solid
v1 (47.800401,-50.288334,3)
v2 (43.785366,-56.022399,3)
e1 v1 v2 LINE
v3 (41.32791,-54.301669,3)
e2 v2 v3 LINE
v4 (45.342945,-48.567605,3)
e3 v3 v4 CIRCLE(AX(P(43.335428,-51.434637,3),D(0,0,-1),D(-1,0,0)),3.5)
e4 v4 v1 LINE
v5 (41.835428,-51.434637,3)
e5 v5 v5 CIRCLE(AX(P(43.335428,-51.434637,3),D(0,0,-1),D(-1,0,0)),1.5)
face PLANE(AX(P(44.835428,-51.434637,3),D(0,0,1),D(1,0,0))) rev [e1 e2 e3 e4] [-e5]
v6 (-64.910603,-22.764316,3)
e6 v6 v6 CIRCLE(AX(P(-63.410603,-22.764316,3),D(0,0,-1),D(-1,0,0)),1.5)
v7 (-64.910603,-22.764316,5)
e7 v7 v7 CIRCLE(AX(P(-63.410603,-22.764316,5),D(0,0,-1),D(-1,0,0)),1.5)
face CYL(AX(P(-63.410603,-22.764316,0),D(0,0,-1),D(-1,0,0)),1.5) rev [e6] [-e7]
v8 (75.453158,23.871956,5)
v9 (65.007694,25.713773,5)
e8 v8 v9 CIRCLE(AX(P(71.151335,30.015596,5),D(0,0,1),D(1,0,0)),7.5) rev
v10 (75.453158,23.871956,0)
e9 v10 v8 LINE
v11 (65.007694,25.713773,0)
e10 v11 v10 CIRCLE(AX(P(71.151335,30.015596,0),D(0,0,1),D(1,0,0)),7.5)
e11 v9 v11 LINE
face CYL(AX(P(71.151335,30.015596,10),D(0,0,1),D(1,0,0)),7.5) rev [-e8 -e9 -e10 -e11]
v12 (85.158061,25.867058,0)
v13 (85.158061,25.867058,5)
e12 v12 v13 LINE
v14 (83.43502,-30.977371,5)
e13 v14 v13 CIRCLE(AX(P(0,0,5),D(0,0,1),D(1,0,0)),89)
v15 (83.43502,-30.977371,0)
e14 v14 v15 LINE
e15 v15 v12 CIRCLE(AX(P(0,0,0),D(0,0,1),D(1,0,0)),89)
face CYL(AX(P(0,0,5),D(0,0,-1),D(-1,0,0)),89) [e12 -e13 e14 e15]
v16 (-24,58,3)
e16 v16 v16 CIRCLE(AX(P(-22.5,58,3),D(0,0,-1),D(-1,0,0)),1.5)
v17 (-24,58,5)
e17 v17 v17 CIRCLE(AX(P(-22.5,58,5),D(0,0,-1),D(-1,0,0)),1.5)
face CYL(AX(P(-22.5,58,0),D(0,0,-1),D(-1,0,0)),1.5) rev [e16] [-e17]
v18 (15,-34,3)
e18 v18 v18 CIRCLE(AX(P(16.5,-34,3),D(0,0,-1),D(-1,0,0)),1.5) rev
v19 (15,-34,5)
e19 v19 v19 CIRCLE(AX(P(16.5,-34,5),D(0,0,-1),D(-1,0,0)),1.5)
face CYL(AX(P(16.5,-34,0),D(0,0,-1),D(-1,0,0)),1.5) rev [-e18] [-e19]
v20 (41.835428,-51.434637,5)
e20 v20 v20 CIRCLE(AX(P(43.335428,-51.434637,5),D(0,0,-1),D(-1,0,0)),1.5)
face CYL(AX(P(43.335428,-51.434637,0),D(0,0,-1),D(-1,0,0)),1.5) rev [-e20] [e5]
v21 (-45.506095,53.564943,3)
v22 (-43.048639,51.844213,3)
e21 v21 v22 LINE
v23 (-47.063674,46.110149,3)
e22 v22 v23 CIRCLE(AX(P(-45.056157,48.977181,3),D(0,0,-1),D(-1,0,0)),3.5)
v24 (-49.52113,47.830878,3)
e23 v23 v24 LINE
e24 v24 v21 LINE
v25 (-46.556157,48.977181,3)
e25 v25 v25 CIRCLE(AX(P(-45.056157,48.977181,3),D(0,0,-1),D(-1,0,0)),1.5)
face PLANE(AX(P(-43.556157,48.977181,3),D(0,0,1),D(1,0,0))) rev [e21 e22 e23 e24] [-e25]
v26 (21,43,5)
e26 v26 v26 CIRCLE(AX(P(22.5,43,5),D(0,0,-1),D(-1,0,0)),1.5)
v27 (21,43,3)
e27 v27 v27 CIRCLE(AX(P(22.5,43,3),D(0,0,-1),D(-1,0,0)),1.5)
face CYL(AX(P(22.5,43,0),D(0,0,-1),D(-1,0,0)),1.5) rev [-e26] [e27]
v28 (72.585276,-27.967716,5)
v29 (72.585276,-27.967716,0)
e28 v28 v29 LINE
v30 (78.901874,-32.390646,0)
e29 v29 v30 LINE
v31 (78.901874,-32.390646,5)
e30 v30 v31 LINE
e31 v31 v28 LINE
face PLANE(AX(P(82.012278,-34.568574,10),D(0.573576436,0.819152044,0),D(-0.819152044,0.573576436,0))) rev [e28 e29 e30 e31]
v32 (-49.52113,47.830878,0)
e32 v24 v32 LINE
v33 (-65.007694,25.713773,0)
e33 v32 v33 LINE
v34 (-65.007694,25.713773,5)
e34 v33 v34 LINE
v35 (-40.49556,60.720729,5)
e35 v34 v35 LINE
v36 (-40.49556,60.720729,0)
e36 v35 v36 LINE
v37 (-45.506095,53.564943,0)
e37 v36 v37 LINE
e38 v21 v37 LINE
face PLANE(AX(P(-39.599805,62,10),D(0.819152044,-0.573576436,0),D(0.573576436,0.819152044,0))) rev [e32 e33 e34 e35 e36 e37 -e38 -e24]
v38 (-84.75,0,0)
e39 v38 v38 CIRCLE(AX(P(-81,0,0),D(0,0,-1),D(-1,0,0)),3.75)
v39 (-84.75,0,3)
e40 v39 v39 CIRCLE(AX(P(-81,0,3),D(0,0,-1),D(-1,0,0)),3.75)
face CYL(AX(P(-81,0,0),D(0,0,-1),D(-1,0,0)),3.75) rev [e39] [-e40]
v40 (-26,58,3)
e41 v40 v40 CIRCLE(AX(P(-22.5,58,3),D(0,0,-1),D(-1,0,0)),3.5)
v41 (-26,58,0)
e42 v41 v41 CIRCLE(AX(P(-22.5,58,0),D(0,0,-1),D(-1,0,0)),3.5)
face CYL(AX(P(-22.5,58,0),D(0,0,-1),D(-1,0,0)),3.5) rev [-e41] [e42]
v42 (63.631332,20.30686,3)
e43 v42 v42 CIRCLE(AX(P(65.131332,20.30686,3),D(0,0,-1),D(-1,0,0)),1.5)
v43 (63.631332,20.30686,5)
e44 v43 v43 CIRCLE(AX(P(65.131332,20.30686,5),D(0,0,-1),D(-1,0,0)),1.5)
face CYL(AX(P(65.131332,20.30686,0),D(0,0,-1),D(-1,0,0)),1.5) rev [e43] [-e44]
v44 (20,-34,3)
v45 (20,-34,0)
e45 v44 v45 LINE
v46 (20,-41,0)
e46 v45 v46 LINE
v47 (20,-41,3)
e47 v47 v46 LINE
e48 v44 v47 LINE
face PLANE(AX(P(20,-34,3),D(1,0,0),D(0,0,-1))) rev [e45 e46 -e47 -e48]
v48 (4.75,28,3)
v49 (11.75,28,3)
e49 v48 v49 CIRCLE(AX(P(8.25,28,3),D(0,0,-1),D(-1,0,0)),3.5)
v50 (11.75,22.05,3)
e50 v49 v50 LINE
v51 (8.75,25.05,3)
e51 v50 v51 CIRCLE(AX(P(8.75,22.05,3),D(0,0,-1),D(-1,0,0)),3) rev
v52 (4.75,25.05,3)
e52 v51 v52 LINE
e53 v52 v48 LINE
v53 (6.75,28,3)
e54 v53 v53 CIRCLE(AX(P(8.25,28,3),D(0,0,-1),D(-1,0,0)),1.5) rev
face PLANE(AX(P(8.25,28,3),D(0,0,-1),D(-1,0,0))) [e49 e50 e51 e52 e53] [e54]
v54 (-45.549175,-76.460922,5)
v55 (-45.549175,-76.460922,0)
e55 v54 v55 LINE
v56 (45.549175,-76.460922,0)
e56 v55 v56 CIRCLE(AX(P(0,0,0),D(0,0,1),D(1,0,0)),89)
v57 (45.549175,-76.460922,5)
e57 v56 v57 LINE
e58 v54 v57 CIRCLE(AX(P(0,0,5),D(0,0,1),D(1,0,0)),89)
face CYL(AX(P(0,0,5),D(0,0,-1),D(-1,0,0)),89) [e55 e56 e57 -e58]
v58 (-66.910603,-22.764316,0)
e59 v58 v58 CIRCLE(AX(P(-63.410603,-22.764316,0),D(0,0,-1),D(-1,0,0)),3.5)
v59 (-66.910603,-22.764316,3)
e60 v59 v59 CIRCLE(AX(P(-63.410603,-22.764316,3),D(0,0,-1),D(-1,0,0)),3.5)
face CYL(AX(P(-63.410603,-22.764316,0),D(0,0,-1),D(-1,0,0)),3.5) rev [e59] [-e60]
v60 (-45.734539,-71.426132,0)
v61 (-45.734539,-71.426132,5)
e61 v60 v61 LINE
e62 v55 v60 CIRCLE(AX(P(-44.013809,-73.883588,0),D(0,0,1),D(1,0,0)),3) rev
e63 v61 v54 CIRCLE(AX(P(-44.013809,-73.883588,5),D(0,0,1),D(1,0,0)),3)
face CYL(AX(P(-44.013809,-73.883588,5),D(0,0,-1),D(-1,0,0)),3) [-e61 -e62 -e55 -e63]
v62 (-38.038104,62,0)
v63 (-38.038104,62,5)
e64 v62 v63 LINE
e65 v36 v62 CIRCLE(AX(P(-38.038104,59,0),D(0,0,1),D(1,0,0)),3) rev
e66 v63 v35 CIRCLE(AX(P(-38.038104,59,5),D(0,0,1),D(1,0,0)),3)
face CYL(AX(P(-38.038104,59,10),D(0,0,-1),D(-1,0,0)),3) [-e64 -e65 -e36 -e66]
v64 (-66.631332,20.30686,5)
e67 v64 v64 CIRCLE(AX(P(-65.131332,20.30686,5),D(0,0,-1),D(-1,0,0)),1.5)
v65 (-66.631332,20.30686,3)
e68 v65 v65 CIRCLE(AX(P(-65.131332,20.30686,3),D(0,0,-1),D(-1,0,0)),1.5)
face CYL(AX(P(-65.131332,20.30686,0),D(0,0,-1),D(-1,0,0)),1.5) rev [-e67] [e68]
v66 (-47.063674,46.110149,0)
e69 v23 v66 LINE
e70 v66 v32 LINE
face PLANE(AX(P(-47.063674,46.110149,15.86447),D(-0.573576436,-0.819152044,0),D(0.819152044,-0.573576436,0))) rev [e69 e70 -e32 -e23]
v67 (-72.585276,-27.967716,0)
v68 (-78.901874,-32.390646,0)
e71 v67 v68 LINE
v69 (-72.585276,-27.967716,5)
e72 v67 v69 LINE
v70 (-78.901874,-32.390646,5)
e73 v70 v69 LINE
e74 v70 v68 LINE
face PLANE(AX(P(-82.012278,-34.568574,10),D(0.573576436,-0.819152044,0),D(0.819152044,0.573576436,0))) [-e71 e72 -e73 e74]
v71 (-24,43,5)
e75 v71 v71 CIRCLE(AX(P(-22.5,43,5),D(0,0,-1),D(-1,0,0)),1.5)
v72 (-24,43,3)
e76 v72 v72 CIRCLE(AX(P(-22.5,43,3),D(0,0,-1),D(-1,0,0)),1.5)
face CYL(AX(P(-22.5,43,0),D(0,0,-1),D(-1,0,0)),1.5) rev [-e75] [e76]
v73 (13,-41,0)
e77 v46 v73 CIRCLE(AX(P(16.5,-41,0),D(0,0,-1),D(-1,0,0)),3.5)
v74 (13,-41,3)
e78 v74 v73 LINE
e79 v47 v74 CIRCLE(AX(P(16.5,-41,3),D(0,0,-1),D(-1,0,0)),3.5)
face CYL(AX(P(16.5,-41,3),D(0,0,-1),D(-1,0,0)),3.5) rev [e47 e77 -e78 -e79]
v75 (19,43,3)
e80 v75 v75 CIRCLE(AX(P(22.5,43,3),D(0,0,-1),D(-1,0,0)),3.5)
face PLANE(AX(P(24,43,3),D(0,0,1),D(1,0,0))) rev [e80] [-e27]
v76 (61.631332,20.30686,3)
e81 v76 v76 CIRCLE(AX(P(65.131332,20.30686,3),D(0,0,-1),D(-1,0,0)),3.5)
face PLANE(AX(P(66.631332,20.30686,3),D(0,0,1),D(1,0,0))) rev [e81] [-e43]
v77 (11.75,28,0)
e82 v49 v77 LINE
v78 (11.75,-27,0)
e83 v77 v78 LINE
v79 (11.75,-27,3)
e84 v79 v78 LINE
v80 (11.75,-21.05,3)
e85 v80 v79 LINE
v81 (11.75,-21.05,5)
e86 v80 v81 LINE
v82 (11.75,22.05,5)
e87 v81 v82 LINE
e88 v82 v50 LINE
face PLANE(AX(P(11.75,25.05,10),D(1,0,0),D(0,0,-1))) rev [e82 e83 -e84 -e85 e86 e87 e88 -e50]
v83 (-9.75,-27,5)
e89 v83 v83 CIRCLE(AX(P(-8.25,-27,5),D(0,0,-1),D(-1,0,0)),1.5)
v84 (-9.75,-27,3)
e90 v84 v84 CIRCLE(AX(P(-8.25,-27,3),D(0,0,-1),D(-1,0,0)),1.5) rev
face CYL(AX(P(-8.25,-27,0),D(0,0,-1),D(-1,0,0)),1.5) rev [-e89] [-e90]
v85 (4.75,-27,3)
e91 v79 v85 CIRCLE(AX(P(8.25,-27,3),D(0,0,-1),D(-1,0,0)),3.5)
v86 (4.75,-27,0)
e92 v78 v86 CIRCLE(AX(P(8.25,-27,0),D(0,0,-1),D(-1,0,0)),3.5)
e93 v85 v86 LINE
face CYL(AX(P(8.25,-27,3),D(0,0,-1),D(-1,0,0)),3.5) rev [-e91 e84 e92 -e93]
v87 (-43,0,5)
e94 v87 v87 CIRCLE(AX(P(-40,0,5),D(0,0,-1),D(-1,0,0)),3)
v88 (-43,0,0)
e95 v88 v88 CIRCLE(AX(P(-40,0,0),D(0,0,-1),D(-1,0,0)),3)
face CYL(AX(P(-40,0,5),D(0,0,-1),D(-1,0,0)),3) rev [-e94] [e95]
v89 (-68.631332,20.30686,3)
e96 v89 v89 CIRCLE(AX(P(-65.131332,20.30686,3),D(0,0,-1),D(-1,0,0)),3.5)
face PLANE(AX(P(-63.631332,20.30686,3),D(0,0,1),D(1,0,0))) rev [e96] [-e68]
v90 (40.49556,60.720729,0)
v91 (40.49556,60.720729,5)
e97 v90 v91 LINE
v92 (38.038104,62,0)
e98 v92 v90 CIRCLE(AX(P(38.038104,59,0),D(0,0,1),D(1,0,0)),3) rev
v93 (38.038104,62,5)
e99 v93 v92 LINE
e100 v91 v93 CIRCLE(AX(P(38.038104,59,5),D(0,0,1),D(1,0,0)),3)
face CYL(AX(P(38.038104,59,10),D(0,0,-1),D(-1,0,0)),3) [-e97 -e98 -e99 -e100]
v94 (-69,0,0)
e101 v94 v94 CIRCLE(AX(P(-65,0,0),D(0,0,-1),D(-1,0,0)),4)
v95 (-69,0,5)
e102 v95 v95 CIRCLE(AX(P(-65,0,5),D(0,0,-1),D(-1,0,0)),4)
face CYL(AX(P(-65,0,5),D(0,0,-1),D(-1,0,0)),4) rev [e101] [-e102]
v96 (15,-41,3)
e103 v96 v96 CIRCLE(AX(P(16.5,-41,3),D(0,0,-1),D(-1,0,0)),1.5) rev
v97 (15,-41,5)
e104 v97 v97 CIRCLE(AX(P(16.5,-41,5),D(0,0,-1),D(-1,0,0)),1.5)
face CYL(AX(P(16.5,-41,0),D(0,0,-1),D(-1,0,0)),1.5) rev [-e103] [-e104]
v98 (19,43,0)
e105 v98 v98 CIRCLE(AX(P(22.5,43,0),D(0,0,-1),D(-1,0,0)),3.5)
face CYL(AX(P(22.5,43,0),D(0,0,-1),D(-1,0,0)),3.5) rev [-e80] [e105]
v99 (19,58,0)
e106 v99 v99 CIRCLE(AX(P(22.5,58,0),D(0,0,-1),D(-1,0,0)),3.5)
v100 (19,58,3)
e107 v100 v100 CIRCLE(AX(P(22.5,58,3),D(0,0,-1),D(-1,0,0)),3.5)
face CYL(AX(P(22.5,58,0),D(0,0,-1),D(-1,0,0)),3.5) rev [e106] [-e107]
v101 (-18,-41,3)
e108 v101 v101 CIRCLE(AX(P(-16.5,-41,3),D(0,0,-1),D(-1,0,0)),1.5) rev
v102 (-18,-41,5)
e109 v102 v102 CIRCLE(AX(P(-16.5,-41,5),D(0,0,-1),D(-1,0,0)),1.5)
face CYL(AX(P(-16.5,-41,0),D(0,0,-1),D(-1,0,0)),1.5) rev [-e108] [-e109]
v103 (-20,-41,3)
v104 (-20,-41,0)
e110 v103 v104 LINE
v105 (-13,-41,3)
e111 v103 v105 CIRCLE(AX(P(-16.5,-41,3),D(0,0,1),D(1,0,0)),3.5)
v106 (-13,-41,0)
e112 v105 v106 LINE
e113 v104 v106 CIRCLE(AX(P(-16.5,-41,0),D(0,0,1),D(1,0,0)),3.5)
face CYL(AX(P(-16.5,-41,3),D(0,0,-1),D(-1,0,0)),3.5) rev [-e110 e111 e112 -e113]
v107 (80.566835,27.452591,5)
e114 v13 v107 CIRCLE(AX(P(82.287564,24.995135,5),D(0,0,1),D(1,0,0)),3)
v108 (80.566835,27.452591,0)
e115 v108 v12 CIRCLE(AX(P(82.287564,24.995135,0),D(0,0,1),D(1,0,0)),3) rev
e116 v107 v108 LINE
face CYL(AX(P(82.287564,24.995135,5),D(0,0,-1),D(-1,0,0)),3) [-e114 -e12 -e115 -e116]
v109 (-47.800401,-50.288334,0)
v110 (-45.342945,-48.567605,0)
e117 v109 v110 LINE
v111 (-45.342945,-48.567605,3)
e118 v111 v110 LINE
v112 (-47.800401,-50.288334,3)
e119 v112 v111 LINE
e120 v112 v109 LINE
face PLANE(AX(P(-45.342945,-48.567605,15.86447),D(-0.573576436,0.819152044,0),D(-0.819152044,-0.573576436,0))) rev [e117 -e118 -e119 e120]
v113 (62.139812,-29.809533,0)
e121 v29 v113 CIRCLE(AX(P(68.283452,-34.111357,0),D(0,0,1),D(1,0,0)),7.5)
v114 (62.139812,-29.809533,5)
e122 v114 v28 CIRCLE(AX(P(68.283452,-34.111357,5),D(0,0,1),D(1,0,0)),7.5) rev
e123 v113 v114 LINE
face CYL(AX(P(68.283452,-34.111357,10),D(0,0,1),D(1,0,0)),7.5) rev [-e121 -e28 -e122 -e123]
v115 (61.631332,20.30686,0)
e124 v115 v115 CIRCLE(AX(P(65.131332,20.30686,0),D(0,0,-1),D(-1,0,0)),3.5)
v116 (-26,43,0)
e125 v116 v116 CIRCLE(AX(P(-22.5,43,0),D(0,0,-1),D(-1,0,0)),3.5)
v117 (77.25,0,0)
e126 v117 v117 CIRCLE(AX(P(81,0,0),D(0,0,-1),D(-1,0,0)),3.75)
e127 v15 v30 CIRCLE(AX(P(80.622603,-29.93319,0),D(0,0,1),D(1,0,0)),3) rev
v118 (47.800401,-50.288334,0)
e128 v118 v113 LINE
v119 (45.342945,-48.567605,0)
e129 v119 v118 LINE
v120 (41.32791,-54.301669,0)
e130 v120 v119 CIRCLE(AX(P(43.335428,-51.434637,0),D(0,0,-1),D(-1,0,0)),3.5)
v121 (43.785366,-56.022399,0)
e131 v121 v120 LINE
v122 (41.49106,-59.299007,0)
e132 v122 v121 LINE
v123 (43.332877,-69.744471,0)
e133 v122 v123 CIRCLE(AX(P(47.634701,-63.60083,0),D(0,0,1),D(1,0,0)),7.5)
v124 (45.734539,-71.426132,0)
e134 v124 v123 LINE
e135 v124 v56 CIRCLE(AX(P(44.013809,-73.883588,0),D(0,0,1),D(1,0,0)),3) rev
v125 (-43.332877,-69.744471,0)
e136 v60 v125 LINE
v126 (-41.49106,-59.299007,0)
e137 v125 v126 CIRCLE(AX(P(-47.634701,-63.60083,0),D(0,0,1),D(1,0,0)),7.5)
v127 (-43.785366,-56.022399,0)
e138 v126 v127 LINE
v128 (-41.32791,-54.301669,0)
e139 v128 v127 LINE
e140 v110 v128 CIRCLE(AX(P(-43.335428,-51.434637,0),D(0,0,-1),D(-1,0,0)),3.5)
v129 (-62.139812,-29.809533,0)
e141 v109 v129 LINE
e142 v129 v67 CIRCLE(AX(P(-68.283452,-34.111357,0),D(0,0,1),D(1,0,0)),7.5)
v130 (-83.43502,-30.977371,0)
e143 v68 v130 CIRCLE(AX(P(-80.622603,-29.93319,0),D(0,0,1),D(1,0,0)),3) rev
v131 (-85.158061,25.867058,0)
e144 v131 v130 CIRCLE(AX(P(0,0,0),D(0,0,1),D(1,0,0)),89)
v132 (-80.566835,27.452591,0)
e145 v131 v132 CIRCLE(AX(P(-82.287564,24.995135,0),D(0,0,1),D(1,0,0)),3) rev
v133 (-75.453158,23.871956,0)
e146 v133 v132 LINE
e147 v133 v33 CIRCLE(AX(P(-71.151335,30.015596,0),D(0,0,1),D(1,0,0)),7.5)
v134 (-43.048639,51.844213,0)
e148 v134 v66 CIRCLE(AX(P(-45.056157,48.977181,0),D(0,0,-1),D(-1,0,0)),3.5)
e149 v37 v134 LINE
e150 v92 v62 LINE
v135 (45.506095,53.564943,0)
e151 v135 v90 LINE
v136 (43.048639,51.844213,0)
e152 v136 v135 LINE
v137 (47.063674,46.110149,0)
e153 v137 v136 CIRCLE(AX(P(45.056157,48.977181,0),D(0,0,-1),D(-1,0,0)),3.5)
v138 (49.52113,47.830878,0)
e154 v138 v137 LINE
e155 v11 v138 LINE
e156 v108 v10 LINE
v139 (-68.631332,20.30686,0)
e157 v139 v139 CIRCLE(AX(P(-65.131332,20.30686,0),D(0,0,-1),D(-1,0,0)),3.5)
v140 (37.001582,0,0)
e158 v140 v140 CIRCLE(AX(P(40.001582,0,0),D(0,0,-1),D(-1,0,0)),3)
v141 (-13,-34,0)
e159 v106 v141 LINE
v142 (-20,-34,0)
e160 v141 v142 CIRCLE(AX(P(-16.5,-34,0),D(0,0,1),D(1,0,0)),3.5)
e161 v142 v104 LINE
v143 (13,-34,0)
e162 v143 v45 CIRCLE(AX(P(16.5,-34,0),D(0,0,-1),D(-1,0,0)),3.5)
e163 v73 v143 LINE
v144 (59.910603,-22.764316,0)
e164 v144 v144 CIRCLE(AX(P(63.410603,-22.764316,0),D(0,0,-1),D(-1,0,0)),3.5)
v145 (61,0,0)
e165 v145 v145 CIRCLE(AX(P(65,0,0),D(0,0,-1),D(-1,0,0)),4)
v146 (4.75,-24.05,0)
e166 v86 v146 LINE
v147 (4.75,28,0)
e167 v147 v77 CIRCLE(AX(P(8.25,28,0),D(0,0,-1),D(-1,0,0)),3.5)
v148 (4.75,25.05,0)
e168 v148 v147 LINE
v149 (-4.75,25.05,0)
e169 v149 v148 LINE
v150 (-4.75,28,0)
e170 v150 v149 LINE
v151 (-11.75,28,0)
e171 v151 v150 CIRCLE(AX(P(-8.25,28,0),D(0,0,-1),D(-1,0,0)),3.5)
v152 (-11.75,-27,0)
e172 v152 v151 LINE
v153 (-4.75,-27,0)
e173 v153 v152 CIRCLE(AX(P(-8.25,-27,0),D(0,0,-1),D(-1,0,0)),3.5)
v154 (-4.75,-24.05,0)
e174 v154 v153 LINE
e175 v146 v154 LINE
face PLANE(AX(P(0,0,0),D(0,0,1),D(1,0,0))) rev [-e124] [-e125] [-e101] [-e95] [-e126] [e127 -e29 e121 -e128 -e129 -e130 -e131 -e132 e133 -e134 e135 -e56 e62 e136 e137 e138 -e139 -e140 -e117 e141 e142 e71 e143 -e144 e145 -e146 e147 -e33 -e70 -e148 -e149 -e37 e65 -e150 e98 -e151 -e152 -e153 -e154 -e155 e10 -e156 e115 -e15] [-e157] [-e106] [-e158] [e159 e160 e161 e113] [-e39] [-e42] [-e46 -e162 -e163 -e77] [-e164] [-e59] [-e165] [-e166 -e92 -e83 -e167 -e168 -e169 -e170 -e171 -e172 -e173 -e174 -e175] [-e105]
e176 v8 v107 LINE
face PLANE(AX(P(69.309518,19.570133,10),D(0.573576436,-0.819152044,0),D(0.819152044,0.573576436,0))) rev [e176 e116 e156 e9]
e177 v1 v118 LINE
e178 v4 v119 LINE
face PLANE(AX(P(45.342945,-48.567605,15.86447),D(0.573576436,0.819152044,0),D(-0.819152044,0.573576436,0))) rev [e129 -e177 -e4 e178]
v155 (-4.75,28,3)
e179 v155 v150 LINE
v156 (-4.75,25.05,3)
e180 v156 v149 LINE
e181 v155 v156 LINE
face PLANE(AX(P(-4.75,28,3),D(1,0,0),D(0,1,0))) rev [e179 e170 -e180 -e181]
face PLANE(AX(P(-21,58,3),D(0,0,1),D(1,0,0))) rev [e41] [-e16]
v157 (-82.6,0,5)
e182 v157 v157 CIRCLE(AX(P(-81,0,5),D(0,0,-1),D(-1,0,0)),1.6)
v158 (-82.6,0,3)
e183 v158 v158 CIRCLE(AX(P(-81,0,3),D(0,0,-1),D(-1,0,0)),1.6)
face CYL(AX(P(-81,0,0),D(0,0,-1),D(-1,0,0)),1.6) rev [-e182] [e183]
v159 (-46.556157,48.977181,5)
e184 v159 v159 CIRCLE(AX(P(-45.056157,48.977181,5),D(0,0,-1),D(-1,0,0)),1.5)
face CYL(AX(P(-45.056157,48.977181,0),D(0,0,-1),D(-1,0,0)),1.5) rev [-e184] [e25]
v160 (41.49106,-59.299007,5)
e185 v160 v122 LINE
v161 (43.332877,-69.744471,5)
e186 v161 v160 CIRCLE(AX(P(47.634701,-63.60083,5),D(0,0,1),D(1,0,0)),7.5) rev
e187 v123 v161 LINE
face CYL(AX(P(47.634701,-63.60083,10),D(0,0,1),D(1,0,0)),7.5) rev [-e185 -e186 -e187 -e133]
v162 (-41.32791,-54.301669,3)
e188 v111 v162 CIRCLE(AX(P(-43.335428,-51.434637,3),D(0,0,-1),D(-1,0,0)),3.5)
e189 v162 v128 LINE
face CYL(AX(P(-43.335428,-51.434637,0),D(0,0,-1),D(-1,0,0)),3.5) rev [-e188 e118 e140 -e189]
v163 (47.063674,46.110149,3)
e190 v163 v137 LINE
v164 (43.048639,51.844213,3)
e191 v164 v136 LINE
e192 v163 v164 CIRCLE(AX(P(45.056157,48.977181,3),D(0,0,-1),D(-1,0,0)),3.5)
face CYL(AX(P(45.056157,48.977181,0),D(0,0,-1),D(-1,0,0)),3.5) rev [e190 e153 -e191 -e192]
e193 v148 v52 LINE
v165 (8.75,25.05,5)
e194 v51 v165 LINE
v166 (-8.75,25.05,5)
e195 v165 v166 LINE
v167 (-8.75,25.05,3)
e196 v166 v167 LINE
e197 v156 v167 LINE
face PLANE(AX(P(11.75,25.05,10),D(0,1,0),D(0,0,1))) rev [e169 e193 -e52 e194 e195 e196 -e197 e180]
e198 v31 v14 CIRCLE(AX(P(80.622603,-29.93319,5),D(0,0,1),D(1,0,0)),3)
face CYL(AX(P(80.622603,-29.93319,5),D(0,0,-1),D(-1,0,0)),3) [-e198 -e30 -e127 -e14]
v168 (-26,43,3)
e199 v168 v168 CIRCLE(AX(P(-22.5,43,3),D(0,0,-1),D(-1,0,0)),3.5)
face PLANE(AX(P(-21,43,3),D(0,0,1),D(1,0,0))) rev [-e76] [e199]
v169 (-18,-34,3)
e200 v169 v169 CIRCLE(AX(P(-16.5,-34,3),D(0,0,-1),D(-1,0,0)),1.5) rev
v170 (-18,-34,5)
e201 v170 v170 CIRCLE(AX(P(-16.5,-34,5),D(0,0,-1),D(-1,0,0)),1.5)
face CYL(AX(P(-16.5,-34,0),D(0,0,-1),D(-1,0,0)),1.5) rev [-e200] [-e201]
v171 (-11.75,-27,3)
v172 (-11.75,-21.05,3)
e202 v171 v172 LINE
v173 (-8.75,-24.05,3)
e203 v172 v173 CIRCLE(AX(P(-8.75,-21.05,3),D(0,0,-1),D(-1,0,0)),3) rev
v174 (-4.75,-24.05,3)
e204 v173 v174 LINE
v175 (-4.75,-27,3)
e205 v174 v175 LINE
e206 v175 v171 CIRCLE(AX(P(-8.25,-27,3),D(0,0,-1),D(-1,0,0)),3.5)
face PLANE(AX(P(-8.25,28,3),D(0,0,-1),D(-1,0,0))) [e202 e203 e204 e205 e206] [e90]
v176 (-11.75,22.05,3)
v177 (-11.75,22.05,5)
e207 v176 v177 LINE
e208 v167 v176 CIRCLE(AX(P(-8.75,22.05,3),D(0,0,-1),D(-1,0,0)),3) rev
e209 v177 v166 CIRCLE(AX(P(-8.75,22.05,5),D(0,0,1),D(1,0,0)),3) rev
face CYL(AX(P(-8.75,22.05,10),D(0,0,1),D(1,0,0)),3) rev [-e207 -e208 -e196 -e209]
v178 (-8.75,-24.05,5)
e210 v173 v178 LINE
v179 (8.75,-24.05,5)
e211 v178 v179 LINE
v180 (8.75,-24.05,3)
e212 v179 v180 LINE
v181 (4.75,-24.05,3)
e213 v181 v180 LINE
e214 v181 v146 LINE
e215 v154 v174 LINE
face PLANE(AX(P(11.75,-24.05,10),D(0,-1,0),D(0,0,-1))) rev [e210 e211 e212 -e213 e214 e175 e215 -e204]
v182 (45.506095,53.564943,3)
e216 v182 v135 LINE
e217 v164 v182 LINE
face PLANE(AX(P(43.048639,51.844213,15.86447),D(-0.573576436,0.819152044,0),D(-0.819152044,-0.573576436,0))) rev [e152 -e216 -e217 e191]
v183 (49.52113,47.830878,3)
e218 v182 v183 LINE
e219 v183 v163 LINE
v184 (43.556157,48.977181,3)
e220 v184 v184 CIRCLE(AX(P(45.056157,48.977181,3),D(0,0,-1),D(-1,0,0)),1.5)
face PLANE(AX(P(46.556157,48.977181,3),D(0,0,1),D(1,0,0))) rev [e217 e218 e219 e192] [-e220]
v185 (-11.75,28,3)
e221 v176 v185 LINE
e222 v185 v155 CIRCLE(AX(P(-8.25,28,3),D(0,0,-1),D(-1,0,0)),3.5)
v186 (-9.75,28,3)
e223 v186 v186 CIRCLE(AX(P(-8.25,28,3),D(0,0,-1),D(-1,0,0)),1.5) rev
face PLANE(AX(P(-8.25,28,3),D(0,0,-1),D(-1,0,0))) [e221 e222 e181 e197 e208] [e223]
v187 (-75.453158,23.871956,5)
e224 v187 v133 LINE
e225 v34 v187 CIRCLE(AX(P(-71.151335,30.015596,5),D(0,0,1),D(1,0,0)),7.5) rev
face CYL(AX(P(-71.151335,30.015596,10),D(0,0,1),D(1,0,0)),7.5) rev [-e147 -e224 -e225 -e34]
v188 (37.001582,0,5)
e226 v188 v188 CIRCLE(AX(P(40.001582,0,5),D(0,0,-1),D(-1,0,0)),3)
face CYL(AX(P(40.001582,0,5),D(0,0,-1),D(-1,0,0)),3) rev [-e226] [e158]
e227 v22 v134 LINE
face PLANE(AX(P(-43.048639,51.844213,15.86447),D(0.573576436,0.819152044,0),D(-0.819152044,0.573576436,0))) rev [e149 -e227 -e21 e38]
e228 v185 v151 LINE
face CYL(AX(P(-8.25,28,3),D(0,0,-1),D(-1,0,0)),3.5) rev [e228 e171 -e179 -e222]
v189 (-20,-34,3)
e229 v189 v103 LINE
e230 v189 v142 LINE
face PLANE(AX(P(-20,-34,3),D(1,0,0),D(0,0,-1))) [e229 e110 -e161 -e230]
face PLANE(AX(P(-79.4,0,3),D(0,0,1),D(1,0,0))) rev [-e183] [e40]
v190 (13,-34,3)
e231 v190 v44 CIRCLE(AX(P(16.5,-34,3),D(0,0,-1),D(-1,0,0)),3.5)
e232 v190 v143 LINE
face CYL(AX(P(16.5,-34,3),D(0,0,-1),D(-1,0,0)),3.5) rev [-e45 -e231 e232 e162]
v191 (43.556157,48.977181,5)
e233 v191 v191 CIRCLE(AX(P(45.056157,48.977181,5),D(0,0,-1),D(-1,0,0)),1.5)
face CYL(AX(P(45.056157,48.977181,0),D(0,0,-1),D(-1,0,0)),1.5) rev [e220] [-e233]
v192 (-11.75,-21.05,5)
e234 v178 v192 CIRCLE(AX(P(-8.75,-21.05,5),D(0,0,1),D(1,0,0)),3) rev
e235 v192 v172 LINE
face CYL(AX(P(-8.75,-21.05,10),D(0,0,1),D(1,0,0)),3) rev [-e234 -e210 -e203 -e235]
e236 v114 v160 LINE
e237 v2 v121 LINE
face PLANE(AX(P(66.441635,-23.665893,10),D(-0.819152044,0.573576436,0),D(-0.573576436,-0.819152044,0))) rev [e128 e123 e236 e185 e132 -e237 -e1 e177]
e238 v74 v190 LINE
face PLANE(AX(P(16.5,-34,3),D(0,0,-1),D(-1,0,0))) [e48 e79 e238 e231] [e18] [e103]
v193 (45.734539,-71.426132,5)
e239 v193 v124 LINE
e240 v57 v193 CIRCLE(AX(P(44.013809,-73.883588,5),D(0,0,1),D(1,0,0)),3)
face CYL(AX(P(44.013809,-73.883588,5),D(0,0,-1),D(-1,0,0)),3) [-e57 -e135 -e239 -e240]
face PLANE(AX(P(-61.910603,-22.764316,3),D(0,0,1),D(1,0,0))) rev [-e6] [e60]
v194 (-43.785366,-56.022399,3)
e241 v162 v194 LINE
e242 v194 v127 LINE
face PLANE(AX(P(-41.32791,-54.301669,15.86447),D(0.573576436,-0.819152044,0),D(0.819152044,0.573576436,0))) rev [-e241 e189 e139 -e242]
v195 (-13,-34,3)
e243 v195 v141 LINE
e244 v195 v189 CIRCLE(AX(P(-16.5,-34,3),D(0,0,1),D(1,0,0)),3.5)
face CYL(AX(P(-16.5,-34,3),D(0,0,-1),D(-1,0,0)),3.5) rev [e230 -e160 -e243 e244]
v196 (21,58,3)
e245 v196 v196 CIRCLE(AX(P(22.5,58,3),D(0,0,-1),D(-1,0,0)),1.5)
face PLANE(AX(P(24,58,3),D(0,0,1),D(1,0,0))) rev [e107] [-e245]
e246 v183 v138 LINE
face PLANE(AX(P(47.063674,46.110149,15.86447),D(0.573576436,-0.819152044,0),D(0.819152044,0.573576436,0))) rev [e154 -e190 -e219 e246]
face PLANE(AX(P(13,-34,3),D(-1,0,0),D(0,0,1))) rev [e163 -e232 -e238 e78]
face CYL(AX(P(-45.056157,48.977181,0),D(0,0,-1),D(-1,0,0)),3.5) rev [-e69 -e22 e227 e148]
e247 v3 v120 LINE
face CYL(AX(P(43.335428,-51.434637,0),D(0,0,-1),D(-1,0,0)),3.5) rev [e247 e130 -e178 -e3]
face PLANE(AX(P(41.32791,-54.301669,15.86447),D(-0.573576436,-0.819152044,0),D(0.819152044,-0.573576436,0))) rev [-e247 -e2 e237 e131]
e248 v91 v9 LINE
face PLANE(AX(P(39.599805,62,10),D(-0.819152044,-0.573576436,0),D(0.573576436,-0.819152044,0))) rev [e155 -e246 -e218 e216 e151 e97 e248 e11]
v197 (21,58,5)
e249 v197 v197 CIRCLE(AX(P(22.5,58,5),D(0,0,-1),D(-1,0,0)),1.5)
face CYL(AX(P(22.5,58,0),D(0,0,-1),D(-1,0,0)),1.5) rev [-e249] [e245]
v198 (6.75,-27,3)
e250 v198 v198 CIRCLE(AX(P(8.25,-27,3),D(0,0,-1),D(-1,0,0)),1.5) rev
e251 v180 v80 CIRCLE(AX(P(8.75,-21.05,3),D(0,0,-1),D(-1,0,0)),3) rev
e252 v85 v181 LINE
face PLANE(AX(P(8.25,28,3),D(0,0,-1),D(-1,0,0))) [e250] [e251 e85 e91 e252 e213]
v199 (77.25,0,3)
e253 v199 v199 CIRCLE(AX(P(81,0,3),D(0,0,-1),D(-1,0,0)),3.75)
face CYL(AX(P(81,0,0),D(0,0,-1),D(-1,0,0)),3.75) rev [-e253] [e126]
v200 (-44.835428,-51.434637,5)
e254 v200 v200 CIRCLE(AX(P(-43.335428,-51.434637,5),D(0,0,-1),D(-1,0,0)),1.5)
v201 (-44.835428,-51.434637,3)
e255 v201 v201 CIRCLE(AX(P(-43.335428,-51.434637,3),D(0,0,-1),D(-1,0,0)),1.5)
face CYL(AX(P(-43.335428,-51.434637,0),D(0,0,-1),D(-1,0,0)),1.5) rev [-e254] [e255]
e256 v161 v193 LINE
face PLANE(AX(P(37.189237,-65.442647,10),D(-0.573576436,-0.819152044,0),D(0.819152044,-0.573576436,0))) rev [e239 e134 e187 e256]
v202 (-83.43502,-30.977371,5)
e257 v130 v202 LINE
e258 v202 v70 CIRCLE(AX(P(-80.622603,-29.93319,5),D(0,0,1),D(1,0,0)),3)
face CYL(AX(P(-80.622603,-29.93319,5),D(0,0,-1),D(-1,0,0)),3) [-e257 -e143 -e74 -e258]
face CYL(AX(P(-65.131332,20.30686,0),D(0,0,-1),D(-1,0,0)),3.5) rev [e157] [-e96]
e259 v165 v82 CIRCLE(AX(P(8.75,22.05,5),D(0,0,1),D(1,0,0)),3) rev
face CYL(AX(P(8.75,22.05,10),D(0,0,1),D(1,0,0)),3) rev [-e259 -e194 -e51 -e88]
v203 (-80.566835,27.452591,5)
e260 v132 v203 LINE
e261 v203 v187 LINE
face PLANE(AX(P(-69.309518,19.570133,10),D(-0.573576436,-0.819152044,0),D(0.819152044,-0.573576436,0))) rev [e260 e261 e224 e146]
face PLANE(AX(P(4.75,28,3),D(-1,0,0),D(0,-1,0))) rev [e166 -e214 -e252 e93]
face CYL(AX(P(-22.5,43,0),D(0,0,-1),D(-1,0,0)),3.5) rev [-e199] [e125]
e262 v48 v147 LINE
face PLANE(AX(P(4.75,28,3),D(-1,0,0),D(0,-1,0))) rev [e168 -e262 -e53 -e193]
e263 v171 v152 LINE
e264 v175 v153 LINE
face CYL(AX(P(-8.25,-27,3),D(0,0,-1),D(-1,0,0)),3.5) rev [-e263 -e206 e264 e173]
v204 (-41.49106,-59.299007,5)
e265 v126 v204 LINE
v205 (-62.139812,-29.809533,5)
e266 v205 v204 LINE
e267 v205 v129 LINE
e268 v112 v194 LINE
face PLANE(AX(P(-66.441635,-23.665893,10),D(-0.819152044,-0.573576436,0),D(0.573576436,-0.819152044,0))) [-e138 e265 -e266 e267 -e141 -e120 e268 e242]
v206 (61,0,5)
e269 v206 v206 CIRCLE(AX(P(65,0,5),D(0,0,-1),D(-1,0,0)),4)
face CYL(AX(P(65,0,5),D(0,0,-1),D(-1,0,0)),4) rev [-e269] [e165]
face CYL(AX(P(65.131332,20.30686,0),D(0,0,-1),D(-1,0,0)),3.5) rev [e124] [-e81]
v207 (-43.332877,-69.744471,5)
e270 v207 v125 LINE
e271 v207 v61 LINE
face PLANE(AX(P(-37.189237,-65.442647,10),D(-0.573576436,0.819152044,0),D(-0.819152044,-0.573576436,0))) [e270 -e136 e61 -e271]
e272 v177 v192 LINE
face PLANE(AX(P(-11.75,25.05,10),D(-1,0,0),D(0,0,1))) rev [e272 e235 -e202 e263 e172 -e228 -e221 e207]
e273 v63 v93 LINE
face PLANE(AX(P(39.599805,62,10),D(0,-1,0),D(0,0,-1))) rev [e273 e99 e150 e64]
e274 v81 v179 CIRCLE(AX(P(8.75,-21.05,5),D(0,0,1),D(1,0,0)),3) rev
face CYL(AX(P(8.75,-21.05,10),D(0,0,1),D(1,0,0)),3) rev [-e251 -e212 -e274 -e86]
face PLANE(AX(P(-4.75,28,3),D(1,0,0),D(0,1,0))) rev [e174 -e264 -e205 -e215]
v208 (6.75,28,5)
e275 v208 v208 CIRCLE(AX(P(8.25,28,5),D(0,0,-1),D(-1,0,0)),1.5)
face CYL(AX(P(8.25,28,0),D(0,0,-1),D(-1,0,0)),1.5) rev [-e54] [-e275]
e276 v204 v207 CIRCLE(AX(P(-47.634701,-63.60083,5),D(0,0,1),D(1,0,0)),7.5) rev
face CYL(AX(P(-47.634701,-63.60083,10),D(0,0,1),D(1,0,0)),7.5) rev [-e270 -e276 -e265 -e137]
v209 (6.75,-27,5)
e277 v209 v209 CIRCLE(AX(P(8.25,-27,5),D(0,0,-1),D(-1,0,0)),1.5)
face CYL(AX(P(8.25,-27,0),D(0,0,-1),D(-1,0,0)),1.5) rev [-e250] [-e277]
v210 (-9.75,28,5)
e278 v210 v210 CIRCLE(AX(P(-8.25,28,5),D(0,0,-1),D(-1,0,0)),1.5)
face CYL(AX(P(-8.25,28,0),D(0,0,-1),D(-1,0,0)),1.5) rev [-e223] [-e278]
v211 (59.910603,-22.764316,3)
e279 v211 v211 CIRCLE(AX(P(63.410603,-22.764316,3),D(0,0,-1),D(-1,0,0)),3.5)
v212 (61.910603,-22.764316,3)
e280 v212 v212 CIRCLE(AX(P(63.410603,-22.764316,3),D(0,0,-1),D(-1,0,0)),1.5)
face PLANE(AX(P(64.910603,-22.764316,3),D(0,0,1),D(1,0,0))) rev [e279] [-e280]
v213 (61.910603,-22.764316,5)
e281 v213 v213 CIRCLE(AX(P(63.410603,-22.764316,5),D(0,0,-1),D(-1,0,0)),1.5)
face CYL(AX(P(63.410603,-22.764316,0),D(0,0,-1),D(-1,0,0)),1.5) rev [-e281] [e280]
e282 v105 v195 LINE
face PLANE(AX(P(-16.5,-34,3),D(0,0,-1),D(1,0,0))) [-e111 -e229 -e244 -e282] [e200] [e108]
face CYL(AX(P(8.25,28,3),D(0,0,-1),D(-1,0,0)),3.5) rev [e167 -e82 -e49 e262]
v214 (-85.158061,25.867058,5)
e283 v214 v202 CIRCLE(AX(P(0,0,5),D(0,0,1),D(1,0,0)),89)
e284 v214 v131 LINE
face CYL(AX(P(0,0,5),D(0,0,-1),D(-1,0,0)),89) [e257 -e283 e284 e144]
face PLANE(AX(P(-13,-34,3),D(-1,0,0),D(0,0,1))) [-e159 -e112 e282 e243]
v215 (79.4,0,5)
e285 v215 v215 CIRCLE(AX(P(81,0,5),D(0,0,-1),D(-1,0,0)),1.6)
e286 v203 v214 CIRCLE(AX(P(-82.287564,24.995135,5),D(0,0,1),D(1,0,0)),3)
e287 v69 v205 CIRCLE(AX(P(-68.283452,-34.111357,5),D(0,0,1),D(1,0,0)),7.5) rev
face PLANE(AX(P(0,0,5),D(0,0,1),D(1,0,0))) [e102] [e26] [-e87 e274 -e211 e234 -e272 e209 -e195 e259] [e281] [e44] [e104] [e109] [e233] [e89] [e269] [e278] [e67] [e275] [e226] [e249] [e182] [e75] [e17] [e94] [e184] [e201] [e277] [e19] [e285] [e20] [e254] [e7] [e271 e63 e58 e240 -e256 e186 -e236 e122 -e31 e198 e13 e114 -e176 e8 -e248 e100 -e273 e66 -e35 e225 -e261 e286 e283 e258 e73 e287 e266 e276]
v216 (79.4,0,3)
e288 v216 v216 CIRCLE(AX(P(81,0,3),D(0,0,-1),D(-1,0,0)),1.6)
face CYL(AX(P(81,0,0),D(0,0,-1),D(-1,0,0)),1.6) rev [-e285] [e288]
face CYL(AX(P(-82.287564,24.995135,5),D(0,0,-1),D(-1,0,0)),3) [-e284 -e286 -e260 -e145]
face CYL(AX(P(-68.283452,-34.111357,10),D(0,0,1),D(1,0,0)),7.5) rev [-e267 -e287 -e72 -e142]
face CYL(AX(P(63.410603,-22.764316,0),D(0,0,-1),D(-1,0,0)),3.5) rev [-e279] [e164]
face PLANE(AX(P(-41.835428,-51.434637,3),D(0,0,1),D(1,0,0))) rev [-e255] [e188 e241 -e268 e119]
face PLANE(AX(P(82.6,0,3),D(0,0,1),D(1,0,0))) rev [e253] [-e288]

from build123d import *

# Parameters (mm, degrees)
SKETCH_1_R                  = 89
EXTRUDE_1_DEPTH             = 5
HOLE_WIZARD_8_D             = 3
HOLE_WIZARD_8_CBORE_D       = 7
HOLE_WIZARD_8_CBORE_DEPTH   = 3
CUT_EXTRUDE_2_DEPTH         = 10
CUT_EXTRUDE_3_DEPTH         = 10
HOLE_WIZARD_8_2_D           = 3
HOLE_WIZARD_8_2_CBORE_D     = 7
HOLE_WIZARD_8_2_CBORE_DEPTH = 3
SKETCH_27_W                 = 23.5
SKETCH_27_H                 = 49.1
CUT_EXTRUDE_4_DEPTH         = 10
FILLET_1_R                  = 3
HOLE_WIZARD_1_0_1_1_D       = 3
FILLET_2_DEPTH              = 5
FILLET_START                = 3
FILLET_2_2_DEPTH            = 2
CUT_EXTRUDE_8_DEPTH         = 3
CUT_EXTRUDE_11_DEPTH        = 3
CUT_EXTRUDE_9_DEPTH         = 3
HOLE_WIZARD_8_3_D           = 3.2
HOLE_WIZARD_8_3_CBORE_D     = 7.5
HOLE_WIZARD_8_3_CBORE_DEPTH = 3
SKETCH_50_R                 = 3
SKETCH_50_R_2               = 4
CUT_EXTRUDE_10_DEPTH        = 126.964280651


with BuildPart() as part:
    # 草图1 → 拉伸1 (new body)
    with BuildSketch(Plane.XY):
        Circle(SKETCH_1_R)
    extrude(amount=EXTRUDE_1_DEPTH)

    # Hole Wizard 8 (through all)
    with Locations(Plane(origin=(45.056156837, 48.977181137, 0), x_dir=(-1, 0, 0), z_dir=(0, 0, -1))):
        with Locations((0, 0), (-20.075175273, -28.67032155), (1.720729309, -100.411818407), (-18.354445964, -71.741496856)):
            hole_wizard_8 = CounterBoreHole(HOLE_WIZARD_8_D / 2, HOLE_WIZARD_8_CBORE_D / 2, HOLE_WIZARD_8_CBORE_DEPTH)

    # 镜向6: Hole Wizard 8 across plane
    add(hole_wizard_8.mirror(Plane(origin=(0, 0, 0), x_dir=(0, 0, 1), z_dir=(1, 0, 0))), mode=Mode.SUBTRACT)

    # 草图21 → Cut-Extrude 2 (cut)
    with BuildSketch(Plane(origin=(0, 0, 0), x_dir=(-1, 0, 0), z_dir=(0, 0, -1))):
        with BuildLine():
            Line((-39.599804667, 62), (39.599804667, 62))
            Line((39.599804667, 62), (69.309517552, 19.570132763))
            Line((69.309517552, 19.570132763), (83.87400404, 29.768295992))
            ThreePointArc((83.87400404, 29.768295992), (0, 89), (-83.87400404, 29.768295992))
            Line((-83.87400404, 29.768295992), (-69.309517552, 19.570132763))
            Line((-69.309517552, 19.570132763), (-39.599804667, 62))
        make_face()
    extrude(amount=-CUT_EXTRUDE_2_DEPTH, mode=Mode.SUBTRACT)

    # 草图22 → Cut-Extrude 3 (cut)
    with BuildSketch(Plane(origin=(0, 0, 0), x_dir=(-1, 0, 0), z_dir=(0, 0, -1))):
        with BuildLine():
            Line((-82.012277652, -34.568574085), (-66.44163537, -23.665892984))
            Line((-66.44163537, -23.665892984), (-37.189237116, -65.442647243))
            Line((-37.189237116, -65.442647243), (-49.428242542, -74.012491103))
            ThreePointArc((-49.428242542, -74.012491103), (-68.615655901, -56.682376144), (-82.012277652, -34.568574085))
        make_face()
    cut_extrude_3 = extrude(amount=-CUT_EXTRUDE_3_DEPTH, mode=Mode.SUBTRACT)

    # 镜向7: Cut-Extrude 3 across plane
    add(cut_extrude_3.mirror(Plane(origin=(0, 0, 0), x_dir=(0, 0, 1), z_dir=(1, 0, 0))), mode=Mode.SUBTRACT)

    # Hole Wizard 8 2 (through all)
    with Locations(Plane(origin=(22.5, 58, 0), x_dir=(-1, 0, 0), z_dir=(0, 0, -1))):
        with Locations((0, 0), (0, -15), (45, -15), (45, 0), (-127.702769625, 168.922663635)):
            CounterBoreHole(HOLE_WIZARD_8_2_D / 2, HOLE_WIZARD_8_2_CBORE_D / 2, HOLE_WIZARD_8_2_CBORE_DEPTH)

    # 草图27 → Cut-Extrude 4 (cut)
    with BuildSketch(Plane(origin=(0, 0, 0), x_dir=(-1, 0, 0), z_dir=(0, 0, -1))):
        with Locations((0, 0.5)):
            Rectangle(SKETCH_27_W, SKETCH_27_H)
    extrude(amount=-CUT_EXTRUDE_4_DEPTH, mode=Mode.SUBTRACT)

    # 圆角1
    fillet_1_edges = [part.edges().sort_by_distance(p)[0] for p in [
        (82.012277652, -34.568574085, 2.5),
        (49.428242542, -74.012491103, 2.5),
        (-82.012277652, -34.568574085, 2.5),
        (-49.428242542, -74.012491103, 2.5),
        (11.75, -24.05, 2.5),
        (11.75, 25.05, 2.5),
        (-11.75, 25.05, 2.5),
        (-11.75, -24.05, 2.5),
        (39.599804667, 62, 2.5),
        (83.87400404, 29.768295992, 2.5),
        (-83.87400404, 29.768295992, 2.5),
        (-39.599804667, 62, 2.5),
    ]]
    fillet(fillet_1_edges, radius=FILLET_1_R)

    # Ø1.0 (1) 直径孔1 (through all)
    with Locations(Plane(origin=(8.25, 28, 0), x_dir=(-1, 0, 0), z_dir=(0, 0, -1))):
        with Locations((0, 0), (16.5, 0), (-8.25, -62), (24.75, -62), (0, -55), (16.5, -55), (-8.25, -69), (24.75, -69)):
            Hole(HOLE_WIZARD_1_0_1_1_D / 2)

    # 圆角2: read off the stored shape, not the designer's step
    # 圆角2 outline → 圆角2 (add)
    with BuildSketch(Plane.XY):
        with BuildLine():
            Line((-37.189237116, -65.442647243), (-41.491060389, -59.299006911))
            ThreePointArc((-41.491060389, -59.299006911), (-40.248642573, -64.903191516), (-43.332877448, -69.744470516))
            Line((-43.332877448, -69.744470516), (-37.189237116, -65.442647243))
        make_face()
        with BuildLine():
            ThreePointArc((-64.834029308, -25.961792377), (-66.003394893, -25.115364244), (-66.73169872, -23.868997528))
            Line((-66.73169872, -23.868997528), (-72.585275702, -27.967716257))
            ThreePointArc((-72.585275702, -27.967716257), (-66.981091097, -26.725298441), (-62.139812097, -29.809533316))
            Line((-62.139812097, -29.809533316), (-64.834029308, -25.961792377))
        make_face()
        with BuildLine():
            ThreePointArc((-68.622817869, 20.550841547), (-67.998364265, 22.314377114), (-66.554758617, 23.504336245))
            Line((-66.554758617, 23.504336245), (-65.007694279, 25.713773095))
            ThreePointArc((-65.007694279, 25.713773095), (-69.848973279, 22.62953822), (-75.453157884, 23.871956035))
            Line((-75.453157884, 23.871956035), (-69.309517552, 19.570132763))
            Line((-69.309517552, 19.570132763), (-68.622817869, 20.550841547))
        make_face()
        with BuildLine():
            ThreePointArc((75.453157884, 23.871956035), (69.848973279, 22.62953822), (65.007694279, 25.713773095))
            Line((65.007694279, 25.713773095), (66.554758617, 23.504336245))
            ThreePointArc((66.554758617, 23.504336245), (67.998364265, 22.314377114), (68.622817869, 20.550841547))
            Line((68.622817869, 20.550841547), (69.309517552, 19.570132763))
            Line((69.309517552, 19.570132763), (75.453157884, 23.871956035))
        make_face()
        with BuildLine():
            ThreePointArc((43.332877448, -69.744470516), (40.248642573, -64.903191516), (41.491060389, -59.299006911))
            Line((41.491060389, -59.299006911), (37.189237116, -65.442647243))
            Line((37.189237116, -65.442647243), (43.332877448, -69.744470516))
        make_face()
        with BuildLine():
            ThreePointArc((62.139812097, -29.809533316), (66.981091097, -26.725298441), (72.585275702, -27.967716257))
            Line((72.585275702, -27.967716257), (66.73169872, -23.868997528))
            ThreePointArc((66.73169872, -23.868997528), (66.003394893, -25.115364244), (64.834029308, -25.961792377))
            Line((64.834029308, -25.961792377), (62.139812097, -29.809533316))
        make_face()
    extrude(amount=FILLET_2_DEPTH)

    # Fillet 2 2 outline → Fillet 2 2 (add)
    with BuildSketch(Plane.XY.offset(FILLET_START)):
        with BuildLine():
            Line((-66.44163537, -23.665892984), (-66.73169872, -23.868997528))
            ThreePointArc((-66.73169872, -23.868997528), (-66.003394893, -25.115364244), (-64.834029308, -25.961792377))
            Line((-64.834029308, -25.961792377), (-66.44163537, -23.665892984))
        make_face()
        with BuildLine():
            Line((-68.622817869, 20.550841547), (-66.554758617, 23.504336245))
            ThreePointArc((-66.554758617, 23.504336245), (-67.998364265, 22.314377114), (-68.622817869, 20.550841547))
        make_face()
        with BuildLine():
            ThreePointArc((68.622817869, 20.550841547), (67.998364265, 22.314377114), (66.554758617, 23.504336245))
            Line((66.554758617, 23.504336245), (68.622817869, 20.550841547))
        make_face()
        with BuildLine():
            ThreePointArc((64.834029308, -25.961792377), (66.003394893, -25.115364244), (66.73169872, -23.868997528))
            Line((66.73169872, -23.868997528), (66.44163537, -23.665892984))
            Line((66.44163537, -23.665892984), (64.834029308, -25.961792377))
        make_face()
    extrude(amount=FILLET_2_2_DEPTH)

    # 草图46 → 切除-拉伸8 (cut)
    with BuildSketch(Plane(origin=(0, 0, 0), x_dir=(-1, 0, 0), z_dir=(0, 0, -1))):
        with BuildLine():
            Line((-4.75, 28), (-4.75, -27))
            ThreePointArc((-4.75, -27), (-8.25, -30.5), (-11.75, -27))
            Line((-11.75, -27), (-11.75, 28))
            ThreePointArc((-11.75, 28), (-8.25, 31.5), (-4.75, 28))
        make_face()
        with BuildLine():
            Line((11.75, 28), (11.75, -27))
            ThreePointArc((11.75, -27), (8.25, -30.5), (4.75, -27))
            Line((4.75, -27), (4.75, 28))
            ThreePointArc((4.75, 28), (8.25, 31.5), (11.75, 28))
        make_face()
    extrude(amount=-CUT_EXTRUDE_8_DEPTH, mode=Mode.SUBTRACT)

    # 草图51 → 切除-拉伸11 (cut)
    with BuildSketch(Plane(origin=(0, 0, 0), x_dir=(-1, 0, 0), z_dir=(0, 0, -1))):
        with BuildLine():
            Line((-13, -34), (-13, -41))
            ThreePointArc((-13, -41), (-16.5, -44.5), (-20, -41))
            Line((-20, -41), (-20, -34))
            ThreePointArc((-20, -34), (-16.5, -30.5), (-13, -34))
        make_face()
    cut_extrude_11 = extrude(amount=-CUT_EXTRUDE_11_DEPTH, mode=Mode.SUBTRACT)

    # 镜向8: 切除-拉伸11 across plane
    add(cut_extrude_11.mirror(Plane(origin=(0, 0, 0), x_dir=(0, 0, 1), z_dir=(1, 0, 0))), mode=Mode.SUBTRACT)

    # 草图47 → 切除-拉伸9 (cut)
    with BuildSketch(Plane(origin=(0, 0, 0), x_dir=(-1, 0, 0), z_dir=(0, 0, -1))):
        with BuildLine():
            Line((-41.327910001, -54.301669425), (-43.785366134, -56.022398734))
            ThreePointArc((-43.785366134, -56.022398734), (-48.659915816, -55.162884106), (-47.800401188, -50.288334424))
            Line((-47.800401188, -50.288334424), (-45.342945056, -48.567605115))
            ThreePointArc((-45.342945056, -48.567605115), (-40.468395373, -49.427119742), (-41.327910001, -54.301669425))
        make_face()
        with BuildLine():
            Line((-47.063674365, 46.110148982), (-49.521130497, 47.830878291))
            ThreePointArc((-49.521130497, 47.830878291), (-50.380645125, 52.705427973), (-45.506095443, 53.564942601))
            Line((-45.506095443, 53.564942601), (-43.04863931, 51.844213292))
            ThreePointArc((-43.04863931, 51.844213292), (-42.189124682, 46.969663609), (-47.063674365, 46.110148982))
        make_face()
        with BuildLine():
            Line((43.04863931, 51.844213292), (45.506095443, 53.564942601))
            ThreePointArc((45.506095443, 53.564942601), (50.380645125, 52.705427973), (49.521130497, 47.830878291))
            Line((49.521130497, 47.830878291), (47.063674365, 46.110148982))
            ThreePointArc((47.063674365, 46.110148982), (42.189124682, 46.969663609), (43.04863931, 51.844213292))
        make_face()
        with BuildLine():
            Line((45.342945056, -48.567605115), (47.800401188, -50.288334424))
            ThreePointArc((47.800401188, -50.288334424), (48.659915816, -55.162884106), (43.785366134, -56.022398734))
            Line((43.785366134, -56.022398734), (41.327910001, -54.301669425))
            ThreePointArc((41.327910001, -54.301669425), (40.468395373, -49.427119742), (45.342945056, -48.567605115))
        make_face()
    extrude(amount=-CUT_EXTRUDE_9_DEPTH, mode=Mode.SUBTRACT)

    # Hole Wizard 8 3 (through all)
    with Locations(Plane(origin=(81, 0, 0), x_dir=(-1, 0, 0), z_dir=(0, 0, -1))):
        with Locations((0, 0), (162, 0)):
            CounterBoreHole(HOLE_WIZARD_8_3_D / 2, HOLE_WIZARD_8_3_CBORE_D / 2, HOLE_WIZARD_8_3_CBORE_DEPTH)

    # 草图50 → 切除-拉伸10 (cut, through all)
    with BuildSketch(Plane(origin=(0, 0, 0), x_dir=(-1, 0, 0), z_dir=(0, 0, -1))):
        with Locations((-40.001582071, 0)):
            Circle(SKETCH_50_R)
        with Locations((40, 0)):
            Circle(SKETCH_50_R)
        with Locations((-65, 0)):
            Circle(SKETCH_50_R_2)
        with Locations((65, 0)):
            Circle(SKETCH_50_R_2)
    extrude(amount=-CUT_EXTRUDE_10_DEPTH, mode=Mode.SUBTRACT)


solid = part.part
